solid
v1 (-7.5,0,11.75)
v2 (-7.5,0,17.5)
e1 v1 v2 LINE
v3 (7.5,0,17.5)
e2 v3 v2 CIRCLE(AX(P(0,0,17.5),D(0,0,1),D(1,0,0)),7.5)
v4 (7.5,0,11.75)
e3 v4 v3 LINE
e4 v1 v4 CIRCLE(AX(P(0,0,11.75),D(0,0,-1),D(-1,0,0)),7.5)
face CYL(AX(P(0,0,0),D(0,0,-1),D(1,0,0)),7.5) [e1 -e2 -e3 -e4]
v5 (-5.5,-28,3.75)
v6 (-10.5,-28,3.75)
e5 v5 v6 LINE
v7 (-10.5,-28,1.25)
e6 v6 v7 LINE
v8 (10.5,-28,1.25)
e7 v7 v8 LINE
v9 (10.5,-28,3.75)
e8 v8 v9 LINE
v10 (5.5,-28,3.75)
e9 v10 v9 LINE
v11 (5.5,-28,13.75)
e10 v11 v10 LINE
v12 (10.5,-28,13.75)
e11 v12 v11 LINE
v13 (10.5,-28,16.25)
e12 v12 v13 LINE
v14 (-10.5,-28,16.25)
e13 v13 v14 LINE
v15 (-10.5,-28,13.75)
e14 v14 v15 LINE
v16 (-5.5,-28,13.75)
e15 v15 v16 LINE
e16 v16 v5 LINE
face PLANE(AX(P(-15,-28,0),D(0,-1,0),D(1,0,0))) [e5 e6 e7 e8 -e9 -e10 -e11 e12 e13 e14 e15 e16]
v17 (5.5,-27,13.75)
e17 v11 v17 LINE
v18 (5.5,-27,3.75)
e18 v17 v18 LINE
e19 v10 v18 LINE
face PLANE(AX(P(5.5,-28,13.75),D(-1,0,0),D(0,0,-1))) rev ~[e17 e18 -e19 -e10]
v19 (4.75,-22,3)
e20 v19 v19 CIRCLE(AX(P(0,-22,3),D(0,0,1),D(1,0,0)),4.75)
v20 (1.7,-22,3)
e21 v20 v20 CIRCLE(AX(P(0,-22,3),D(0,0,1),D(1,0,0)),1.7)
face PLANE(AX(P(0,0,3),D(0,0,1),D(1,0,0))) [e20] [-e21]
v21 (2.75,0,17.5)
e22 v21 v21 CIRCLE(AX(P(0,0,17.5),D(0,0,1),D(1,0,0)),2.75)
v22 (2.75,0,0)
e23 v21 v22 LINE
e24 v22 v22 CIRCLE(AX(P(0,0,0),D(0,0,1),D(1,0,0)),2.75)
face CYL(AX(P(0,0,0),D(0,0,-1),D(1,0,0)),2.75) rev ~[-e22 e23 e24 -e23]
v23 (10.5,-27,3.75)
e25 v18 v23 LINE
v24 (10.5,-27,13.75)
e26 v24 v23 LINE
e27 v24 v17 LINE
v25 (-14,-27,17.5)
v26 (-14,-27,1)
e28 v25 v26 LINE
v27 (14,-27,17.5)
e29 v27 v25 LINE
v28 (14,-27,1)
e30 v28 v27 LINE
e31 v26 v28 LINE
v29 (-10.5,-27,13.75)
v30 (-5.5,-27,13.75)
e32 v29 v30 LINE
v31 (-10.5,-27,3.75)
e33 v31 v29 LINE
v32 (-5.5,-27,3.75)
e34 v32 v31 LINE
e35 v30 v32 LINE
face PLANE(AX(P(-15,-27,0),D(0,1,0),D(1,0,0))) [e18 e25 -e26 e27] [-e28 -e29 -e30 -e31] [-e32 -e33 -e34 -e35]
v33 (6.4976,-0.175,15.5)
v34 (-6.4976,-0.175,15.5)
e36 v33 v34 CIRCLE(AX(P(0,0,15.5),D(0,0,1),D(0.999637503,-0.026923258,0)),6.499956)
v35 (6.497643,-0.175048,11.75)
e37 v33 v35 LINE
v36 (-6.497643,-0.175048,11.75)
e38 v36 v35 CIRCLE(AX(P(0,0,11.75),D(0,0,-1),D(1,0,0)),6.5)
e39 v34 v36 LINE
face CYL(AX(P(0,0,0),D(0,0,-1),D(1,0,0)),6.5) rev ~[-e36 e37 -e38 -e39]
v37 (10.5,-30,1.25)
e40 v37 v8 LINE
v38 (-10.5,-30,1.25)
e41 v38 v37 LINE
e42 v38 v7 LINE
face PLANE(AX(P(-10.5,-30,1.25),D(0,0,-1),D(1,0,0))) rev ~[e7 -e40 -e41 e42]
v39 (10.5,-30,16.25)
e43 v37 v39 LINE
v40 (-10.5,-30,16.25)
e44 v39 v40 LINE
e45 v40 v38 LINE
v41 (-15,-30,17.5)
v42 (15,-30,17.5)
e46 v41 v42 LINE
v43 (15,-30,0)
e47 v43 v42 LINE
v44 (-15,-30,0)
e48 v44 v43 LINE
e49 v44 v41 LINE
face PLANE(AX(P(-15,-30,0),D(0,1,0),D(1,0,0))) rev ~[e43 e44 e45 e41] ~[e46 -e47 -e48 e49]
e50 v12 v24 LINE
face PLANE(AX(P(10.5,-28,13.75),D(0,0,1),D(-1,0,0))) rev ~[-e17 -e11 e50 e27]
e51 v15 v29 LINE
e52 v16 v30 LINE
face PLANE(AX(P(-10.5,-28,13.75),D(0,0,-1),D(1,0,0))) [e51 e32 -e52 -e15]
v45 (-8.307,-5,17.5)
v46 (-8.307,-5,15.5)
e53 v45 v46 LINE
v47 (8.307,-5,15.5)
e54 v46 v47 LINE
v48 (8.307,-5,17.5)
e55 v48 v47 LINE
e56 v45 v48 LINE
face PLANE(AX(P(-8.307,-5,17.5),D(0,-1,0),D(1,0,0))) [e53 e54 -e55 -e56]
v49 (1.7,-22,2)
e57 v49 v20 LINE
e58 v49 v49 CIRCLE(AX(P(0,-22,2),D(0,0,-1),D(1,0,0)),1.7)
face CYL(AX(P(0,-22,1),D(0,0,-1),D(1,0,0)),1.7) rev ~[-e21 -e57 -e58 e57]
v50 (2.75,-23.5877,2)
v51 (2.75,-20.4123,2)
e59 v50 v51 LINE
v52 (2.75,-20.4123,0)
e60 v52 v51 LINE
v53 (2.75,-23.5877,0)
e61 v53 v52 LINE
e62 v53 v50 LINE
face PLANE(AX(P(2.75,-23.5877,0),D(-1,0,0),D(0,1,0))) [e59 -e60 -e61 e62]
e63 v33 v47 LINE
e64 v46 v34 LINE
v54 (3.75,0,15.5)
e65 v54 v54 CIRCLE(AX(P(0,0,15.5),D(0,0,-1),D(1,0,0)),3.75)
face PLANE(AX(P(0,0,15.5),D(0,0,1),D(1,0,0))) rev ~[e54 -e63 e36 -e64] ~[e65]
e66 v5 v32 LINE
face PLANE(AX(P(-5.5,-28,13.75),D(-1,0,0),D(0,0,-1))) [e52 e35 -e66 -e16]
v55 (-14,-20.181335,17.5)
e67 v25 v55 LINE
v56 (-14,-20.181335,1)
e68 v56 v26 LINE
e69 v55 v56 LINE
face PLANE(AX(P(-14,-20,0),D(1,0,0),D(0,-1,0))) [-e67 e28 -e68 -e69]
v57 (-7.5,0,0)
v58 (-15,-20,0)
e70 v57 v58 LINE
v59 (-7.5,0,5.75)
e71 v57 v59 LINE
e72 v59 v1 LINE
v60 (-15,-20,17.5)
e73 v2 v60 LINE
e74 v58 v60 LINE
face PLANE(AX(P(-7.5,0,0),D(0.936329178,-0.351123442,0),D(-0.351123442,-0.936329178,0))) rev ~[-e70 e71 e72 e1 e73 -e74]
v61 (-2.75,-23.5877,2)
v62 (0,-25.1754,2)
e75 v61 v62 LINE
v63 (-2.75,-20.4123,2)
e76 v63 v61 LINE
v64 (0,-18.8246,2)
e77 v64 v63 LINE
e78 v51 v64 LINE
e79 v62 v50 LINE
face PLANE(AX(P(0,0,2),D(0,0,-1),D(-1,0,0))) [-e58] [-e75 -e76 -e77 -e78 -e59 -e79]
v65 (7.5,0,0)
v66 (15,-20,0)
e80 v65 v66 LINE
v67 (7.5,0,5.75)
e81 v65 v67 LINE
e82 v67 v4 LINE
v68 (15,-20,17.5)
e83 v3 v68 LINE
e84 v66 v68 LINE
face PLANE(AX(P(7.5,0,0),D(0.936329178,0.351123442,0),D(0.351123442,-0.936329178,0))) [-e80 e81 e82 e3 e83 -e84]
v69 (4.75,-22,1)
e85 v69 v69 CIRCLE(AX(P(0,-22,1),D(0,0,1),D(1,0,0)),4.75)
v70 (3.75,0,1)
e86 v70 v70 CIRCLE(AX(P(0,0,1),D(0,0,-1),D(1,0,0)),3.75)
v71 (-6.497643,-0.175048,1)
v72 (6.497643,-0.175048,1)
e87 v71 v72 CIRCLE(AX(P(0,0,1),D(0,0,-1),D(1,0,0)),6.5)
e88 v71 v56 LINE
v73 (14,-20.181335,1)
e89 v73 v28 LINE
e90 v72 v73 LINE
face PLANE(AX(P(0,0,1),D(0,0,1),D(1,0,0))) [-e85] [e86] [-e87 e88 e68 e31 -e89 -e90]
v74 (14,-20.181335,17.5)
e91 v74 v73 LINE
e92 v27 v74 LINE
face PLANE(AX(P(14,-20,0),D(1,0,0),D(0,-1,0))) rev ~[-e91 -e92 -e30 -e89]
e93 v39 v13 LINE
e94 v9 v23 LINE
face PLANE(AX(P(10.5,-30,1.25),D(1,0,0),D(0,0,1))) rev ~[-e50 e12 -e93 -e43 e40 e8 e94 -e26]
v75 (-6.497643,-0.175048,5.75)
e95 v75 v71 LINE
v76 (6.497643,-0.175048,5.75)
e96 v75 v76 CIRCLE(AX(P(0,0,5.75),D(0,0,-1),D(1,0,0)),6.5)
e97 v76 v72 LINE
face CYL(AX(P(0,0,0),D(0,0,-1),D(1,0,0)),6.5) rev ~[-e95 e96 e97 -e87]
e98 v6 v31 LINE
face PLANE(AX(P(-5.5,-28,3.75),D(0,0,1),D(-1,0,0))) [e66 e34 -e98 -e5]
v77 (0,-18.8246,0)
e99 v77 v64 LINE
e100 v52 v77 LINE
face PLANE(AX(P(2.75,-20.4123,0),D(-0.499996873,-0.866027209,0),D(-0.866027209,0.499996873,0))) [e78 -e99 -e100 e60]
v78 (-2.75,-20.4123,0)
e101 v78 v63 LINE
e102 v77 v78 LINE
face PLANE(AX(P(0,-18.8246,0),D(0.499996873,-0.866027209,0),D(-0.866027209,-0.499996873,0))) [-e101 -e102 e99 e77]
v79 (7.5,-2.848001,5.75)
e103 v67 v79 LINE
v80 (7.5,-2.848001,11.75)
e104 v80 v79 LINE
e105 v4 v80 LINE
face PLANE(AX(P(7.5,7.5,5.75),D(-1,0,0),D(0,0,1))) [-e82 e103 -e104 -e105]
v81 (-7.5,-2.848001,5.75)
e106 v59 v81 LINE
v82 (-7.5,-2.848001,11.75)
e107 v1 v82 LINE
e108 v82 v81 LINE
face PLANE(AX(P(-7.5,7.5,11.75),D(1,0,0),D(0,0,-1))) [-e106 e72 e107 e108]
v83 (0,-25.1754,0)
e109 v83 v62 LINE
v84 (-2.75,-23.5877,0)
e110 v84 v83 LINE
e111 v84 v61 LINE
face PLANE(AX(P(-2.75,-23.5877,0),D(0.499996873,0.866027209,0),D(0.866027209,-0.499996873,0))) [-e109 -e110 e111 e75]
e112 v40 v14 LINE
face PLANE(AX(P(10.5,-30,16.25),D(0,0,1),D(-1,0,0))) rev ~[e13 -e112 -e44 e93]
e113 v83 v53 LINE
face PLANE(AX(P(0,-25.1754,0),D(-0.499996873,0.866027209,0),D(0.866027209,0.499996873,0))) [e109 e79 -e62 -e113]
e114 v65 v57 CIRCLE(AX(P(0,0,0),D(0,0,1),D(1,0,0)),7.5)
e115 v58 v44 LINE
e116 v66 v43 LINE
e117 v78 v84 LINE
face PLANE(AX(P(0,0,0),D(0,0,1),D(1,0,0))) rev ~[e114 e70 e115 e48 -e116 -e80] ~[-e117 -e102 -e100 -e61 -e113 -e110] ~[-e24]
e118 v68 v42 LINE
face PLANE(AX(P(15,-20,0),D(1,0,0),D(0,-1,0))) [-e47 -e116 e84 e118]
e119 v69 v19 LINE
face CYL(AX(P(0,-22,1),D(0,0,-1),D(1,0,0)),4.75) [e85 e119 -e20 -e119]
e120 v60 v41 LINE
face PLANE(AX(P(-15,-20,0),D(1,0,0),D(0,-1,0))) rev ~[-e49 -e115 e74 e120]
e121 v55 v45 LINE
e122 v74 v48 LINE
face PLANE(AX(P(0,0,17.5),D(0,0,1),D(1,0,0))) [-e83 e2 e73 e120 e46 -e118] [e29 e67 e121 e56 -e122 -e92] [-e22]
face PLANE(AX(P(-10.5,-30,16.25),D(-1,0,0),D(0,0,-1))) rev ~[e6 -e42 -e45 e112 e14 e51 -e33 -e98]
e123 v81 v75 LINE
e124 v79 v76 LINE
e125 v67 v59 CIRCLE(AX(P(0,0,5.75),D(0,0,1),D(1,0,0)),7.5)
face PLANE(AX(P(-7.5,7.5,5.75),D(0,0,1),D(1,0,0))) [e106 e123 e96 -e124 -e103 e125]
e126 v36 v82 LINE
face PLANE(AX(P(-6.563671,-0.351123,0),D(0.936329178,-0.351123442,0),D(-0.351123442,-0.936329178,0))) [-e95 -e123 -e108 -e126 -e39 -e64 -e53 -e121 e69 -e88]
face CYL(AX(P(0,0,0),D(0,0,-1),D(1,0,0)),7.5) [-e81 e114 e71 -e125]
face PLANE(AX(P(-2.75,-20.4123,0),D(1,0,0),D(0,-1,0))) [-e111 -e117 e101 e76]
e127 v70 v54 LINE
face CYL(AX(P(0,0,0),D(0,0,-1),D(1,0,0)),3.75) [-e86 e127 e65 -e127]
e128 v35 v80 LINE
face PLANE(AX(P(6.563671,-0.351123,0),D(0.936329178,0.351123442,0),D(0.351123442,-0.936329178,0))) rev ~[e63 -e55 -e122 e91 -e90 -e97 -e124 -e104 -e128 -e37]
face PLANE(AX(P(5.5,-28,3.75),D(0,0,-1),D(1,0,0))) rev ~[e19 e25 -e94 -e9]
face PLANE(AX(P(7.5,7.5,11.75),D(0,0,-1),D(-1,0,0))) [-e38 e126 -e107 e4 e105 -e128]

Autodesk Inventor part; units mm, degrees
ref_plane "YZ Plane" through (0, 0, 0) normal (1, 0, 0) x (0, 1, 0)
sketch "Sketch1" plane through (0, 0, 0) normal (0, 0, 1) x (1, 0, 0)
  arc A0 (7.5, 0) -> (-7.5, 0) centre (0, 0) ccw
  line L0 (-7.5, 0) -> (-15, -20)
  line L1 (7.5, 0) -> (15, -20)
  line L2 (-7.5, 0) -> (7.5, 0) construction
  line L3 (-15, -30) -> (15, -30)
  line L4 (-15, -30) -> (15, -30) construction
  circle A1 centre (0, 0) radius 2.75
  line L5 (-15, -20) -> (-15, -30)
  line L6 (15, -20) -> (15, -30)
  dimension "d0" = 15
  dimension "d8" = 5.5
  dimension "d67" = 30
  dimension "d68" = 30
  dimension "d96" = 10
extrude "Extrusion1" add sketch "Sketch1" along normal blind 17.5
shell "Shell2" thickness 1 removed faces 1 at (0.1105, -14.2433, 17.5)
thicken "Thicken5" operation add thickness 2 both sides no extend neighbours no toward (0, 1, 0) faces at (-4.6667, -29, 6.5)
sketch "Sketch12" plane through (-15, -30, 0) normal (0, -1, 0) x (1, 0, 0)
  line L0 (0, 0) -> (30, 0) projected
  line L1 (30, 0) -> (30, 17.5) projected
  line L2 (0, 17.5) -> (30, 17.5) projected
  line L3 (0, 0) -> (0, 17.5) projected
  line L4 (25.5, 16.25) -> (4.5, 16.25)
  line L5 (4.5, 16.25) -> (4.5, 1.25)
  line L6 (4.5, 1.25) -> (25.5, 1.25)
  line L7 (25.5, 1.25) -> (25.5, 16.25)
  line L8 (25.5, 16.25) -> (25.5, 17.5)
  line L9 (21.4976, 17.5) -> (29, 17.5) projected
  line L10 (25.5, 1.25) -> (25.5, 0)
  line L11 (0, 0) -> (30, 0) projected
  point P0 (15, 0)
  dimension "d74" = 21
  dimension "d75" = 15
  dimension "d77" = 4.5
  dimension "d78" = 4.5
  dimension "d79" = 1.25
extrude "Extrusion6" cut sketch "Sketch12" against normal blind 2 contours L6 L5 L4 L7
sketch "Sketch13" plane through (-15, -28, 0) normal (0, -1, 0) x (1, 0, 0)
  line L0 (25.5, 16.25) -> (25.5, 1.25) projected
  line L1 (4.5, 1.25) -> (4.5, 16.25) projected
  line L2 (4.5, 13.75) -> (9.5, 13.75)
  line L3 (9.5, 13.75) -> (9.5, 3.75)
  line L4 (9.5, 3.75) -> (4.5, 3.75)
  line L5 (4.5, 3.75) -> (4.5, 13.75)
  line L6 (4.5, 16.25) -> (25.5, 16.25) projected
  line L7 (25.5, 1.25) -> (4.5, 1.25) projected
  line L8 (25.5, 13.75) -> (20.5, 13.75)
  line L9 (20.5, 13.75) -> (20.5, 3.75)
  line L10 (20.5, 3.75) -> (25.5, 3.75)
  line L11 (25.5, 3.75) -> (25.5, 13.75)
  point P0 (15, 0)
  dimension "d82" = 5
  dimension "d83" = 10
  dimension "d84" = 2.5
  dimension "d85" = 2.5
  dimension "d86" = 5
  dimension "d87" = 10
  dimension "d88" = 2.5
  dimension "d89" = 2.5
extrude "Extrusion7" cut sketch "Sketch13" against normal up to next contours L0 L10 L9 L8 | L2 L3 L4 L1
sketch "Sketch14" plane through (-15, -28, 0) normal (0, -1, 0) x (1, 0, 0)
  line L0 (4.5, 16.25) -> (25.5, 16.25) projected
  line L1 (25.5, 16.25) -> (25.5, 1.25) projected
  line L2 (4.5, 1.25) -> (4.5, 16.25) projected
  line L3 (25.5, 1.25) -> (4.5, 1.25) projected
  line L4 (15, 1.25) -> (15, 16.25) construction
  line L5 (25.5, 8.75) -> (4.5, 8.75) construction
  line L6 (4.5, 13.75) -> (4.5, 3.75) projected
  point P0 (15, 0)
  point P1 (15, 9.5)
ref_plane "Work Plane2" through (0, -7.5, 0) normal (0, 1, 0) x (-1, 0, 0)
sketch "Sketch16" plane through (0, 0, 1) normal (0, 0, 1) x (1, 0, 0)
  line L0 (14, -27) -> (-14, -27) projected
  line L1 (0, -27) -> (0, -16.6699) construction
  point P0 (0, 0)
  point P1 (0, -22)
  point P2 (-0.2812, -15.3392)
  point P3 (3.9903, -15.1005)
  dimension "d97" = 5
hole "Hole3" at (0, -22, 1) direction (0, 0, -1) diameter 3.4 depth 1 clearance for "Hex Head Cap Screw ISO 24017" size "M3" standard "ISO"
sketch "Sketch17" plane through (0, 0, 1) normal (0, 0, 1) x (1, 0, 0)
  circle A0 centre (0, -22) radius 1.7 projected
  circle A1 centre (0, -22) radius 4.75
  point P0 (0, 0)
  dimension "d105" = 9.5
extrude "Extrusion9" add sketch "Sketch17" along normal blind 2
sketch "Sketch18" plane through (0, 0, 0) normal (0, 0, -1) x (-1, 0, 0)
  circle A0 centre (0, -22) radius 1.7 projected
  circle A1 centre (0, -22) radius 2.75 construction
  line L0 (2.75, -20.4123) -> (2.75, -23.5877)
  line L1 (2.75, -23.5877) -> (0, -25.1754)
  line L2 (0, -25.1754) -> (-2.75, -23.5877)
  line L3 (-2.75, -23.5877) -> (-2.75, -20.4123)
  line L4 (-2.75, -20.4123) -> (0, -18.8246)
  line L5 (0, -18.8246) -> (2.75, -20.4123)
  point P0 (0, 0)
  dimension "d108" = 5.5
extrude "Extrusion10" cut sketch "Sketch18" against normal blind 2
ref_plane "Work Plane3" through (0, 7.5, 0) normal (0, 1, 0) x (-1, 0, 0)
sketch "Sketch19" plane through (0, 7.5, 0) normal (0, 1, 0) x (-1, 0, 0)
  line L0 (-14, 17.5) -> (14, 17.5) projected
  line L1 (0, 17.5) -> (0, 0) construction
  line L2 (-7.5, 11.75) -> (7.5, 11.75)
  line L3 (7.5, 11.75) -> (7.5, 5.75)
  line L4 (7.5, 5.75) -> (-7.5, 5.75)
  line L5 (-7.5, 5.75) -> (-7.5, 11.75)
  line L6 (-7.5, 11.75) -> (7.5, 5.75) construction
  line L7 (7.5, 11.75) -> (-7.5, 5.75) construction
  point P0 (0, 8.75)
  dimension "d111" = 15
  dimension "d112" = 6
extrude "Extrusion11" cut sketch "Sketch19" against normal up to next
sketch "Sketch22" plane through (0, 0, 17.5) normal (0, 0, 1) x (1, 0, 0)
  line L0 (-8.307, -5) -> (8.307, -5)
  line L1 (6.4976, -0.175) -> (14, -20.1813) projected
  line L2 (-14, -20.1813) -> (-6.4976, -0.175) projected
  arc A0 (6.4976, -0.175) -> (-6.4976, -0.175) centre (0, 0) ccw projected
  circle A1 centre (0, 0) radius 2.75 projected
  dimension "d117" = 5
extrude "Extrusion13" add sketch "Sketch22" against normal blind 2
properties part number "LampeSolaire2_LedAmoviblePart 3D printed"
